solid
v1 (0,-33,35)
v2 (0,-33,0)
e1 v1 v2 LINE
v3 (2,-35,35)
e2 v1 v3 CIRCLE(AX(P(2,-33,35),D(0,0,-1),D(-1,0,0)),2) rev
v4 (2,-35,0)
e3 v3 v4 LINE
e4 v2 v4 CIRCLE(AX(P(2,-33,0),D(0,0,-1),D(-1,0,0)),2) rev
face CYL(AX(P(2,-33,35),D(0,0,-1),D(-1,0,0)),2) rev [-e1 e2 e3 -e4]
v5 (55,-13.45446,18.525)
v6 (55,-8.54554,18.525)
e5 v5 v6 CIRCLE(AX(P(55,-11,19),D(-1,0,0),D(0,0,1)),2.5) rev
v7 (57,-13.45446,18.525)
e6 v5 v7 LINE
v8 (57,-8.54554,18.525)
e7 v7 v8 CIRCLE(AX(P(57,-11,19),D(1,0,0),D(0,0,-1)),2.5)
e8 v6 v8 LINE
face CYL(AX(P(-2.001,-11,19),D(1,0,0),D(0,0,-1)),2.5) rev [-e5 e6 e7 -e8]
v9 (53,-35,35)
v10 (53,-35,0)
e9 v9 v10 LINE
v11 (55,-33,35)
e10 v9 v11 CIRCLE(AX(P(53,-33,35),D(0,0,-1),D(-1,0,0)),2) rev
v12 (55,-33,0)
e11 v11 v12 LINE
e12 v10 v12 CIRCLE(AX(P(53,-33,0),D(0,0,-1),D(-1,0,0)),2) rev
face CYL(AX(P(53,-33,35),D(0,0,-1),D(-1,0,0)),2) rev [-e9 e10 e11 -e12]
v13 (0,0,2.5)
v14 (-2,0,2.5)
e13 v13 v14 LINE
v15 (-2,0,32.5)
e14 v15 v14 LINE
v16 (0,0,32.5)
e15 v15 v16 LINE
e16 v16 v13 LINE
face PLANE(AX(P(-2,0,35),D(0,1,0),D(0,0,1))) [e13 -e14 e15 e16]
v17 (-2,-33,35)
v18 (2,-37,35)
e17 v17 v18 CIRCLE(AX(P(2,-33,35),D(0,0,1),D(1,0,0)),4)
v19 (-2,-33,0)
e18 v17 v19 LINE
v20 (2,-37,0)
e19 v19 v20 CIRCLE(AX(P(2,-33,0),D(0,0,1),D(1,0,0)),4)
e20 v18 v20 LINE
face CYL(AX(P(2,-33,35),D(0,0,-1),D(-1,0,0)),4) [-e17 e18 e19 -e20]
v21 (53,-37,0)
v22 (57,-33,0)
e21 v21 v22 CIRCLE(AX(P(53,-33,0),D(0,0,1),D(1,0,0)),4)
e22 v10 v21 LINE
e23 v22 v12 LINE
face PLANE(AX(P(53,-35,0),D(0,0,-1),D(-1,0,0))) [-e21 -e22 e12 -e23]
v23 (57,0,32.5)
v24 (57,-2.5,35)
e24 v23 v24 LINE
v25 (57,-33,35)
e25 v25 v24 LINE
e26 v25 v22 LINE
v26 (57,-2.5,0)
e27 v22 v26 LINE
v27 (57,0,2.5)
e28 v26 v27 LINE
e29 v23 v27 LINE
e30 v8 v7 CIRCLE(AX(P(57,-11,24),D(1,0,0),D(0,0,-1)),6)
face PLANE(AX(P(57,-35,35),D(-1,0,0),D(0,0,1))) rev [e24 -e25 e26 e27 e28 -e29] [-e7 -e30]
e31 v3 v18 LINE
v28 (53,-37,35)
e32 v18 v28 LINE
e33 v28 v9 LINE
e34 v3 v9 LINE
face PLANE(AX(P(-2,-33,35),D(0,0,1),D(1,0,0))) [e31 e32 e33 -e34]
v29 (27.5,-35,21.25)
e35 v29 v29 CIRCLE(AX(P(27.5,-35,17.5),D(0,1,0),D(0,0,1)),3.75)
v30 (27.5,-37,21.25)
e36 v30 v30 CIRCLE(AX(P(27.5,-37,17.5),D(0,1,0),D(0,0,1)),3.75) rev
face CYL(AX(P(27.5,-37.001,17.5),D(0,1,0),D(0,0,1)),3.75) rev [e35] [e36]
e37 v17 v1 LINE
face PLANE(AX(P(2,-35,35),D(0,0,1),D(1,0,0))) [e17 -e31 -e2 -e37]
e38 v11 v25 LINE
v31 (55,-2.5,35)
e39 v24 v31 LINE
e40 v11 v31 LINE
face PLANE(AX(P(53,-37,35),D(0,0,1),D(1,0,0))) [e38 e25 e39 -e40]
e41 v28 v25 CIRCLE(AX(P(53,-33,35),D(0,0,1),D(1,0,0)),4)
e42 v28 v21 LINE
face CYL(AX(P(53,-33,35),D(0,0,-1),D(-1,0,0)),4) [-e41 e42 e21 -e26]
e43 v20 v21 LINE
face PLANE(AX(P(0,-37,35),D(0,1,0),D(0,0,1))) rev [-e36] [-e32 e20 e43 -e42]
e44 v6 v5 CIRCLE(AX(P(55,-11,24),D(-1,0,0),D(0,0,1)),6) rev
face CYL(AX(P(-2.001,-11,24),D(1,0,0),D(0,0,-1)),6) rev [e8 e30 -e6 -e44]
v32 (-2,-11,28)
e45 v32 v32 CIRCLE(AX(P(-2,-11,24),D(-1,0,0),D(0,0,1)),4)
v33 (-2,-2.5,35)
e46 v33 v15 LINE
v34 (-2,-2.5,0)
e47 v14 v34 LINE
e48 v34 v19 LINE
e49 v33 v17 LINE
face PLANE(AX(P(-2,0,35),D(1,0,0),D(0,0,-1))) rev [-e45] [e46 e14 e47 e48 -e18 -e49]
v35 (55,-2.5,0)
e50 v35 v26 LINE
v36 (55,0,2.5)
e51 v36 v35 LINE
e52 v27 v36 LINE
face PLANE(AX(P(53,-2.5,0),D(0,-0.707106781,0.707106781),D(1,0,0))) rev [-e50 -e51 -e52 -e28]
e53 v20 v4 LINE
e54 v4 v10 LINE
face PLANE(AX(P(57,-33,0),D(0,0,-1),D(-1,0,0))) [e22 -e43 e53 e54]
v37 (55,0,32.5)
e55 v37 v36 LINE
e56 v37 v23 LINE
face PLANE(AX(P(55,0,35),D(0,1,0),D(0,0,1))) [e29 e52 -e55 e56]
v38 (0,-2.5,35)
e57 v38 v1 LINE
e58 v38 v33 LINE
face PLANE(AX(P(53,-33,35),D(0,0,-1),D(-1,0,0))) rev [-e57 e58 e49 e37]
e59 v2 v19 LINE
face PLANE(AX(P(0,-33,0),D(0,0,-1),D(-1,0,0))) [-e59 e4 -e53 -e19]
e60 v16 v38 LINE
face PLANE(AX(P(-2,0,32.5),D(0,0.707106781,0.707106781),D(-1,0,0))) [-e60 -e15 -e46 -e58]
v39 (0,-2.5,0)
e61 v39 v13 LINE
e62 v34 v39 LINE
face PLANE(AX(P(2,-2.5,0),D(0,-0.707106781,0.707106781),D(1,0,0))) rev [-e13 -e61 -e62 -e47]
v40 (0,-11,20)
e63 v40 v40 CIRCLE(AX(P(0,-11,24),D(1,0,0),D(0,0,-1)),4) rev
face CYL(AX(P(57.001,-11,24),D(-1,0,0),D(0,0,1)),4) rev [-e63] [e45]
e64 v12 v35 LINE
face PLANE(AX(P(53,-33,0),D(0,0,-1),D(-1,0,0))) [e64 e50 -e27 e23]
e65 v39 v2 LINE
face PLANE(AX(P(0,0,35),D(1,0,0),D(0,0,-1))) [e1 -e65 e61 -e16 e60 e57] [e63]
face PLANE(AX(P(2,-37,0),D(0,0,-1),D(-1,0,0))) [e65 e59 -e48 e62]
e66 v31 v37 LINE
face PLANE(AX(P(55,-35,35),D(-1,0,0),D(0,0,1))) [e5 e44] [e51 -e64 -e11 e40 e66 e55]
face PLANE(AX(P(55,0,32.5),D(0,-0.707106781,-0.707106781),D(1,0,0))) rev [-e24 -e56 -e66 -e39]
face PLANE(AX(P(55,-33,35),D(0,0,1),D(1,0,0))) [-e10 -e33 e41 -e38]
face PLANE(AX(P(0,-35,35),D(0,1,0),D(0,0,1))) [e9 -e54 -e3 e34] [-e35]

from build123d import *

# Parameters (mm, degrees)
BASE_FLANGE1_DEPTH = 35
CUT_EXTRUDE1_REACH = 79.942
CUT_EXTRUDE2_REACH = 79.942
SKETCH7_R          = 4
CUT_EXTRUDE3_REACH = 77.492
SKETCH8_R          = 3.75
CHAMFER1_SIZE      = 2.5


# Sheet-metal steps are written as plain solids
with BuildPart() as part:
    # Sketch1 → Base-Flange1 (new body)
    with BuildSketch(Plane.XY):
        with BuildLine():
            Line((0, 0), (0, -33))
            ThreePointArc((0, -33), (0.585786438, -34.414213562), (2, -35))
            Line((2, -35), (53, -35))
            ThreePointArc((53, -35), (54.414213562, -34.414213562), (55, -33))
            Line((55, -33), (55, 0))
            Line((55, 0), (57, 0))
            Line((57, 0), (57, -33))
            ThreePointArc((57, -33), (55.828427125, -35.828427125), (53, -37))
            Line((53, -37), (2, -37))
            ThreePointArc((2, -37), (-0.828427125, -35.828427125), (-2, -33))
            Line((-2, -33), (-2, 0))
            Line((-2, 0), (0, 0))
        make_face()
    extrude(amount=BASE_FLANGE1_DEPTH)

    # Sketch6 → Cut-Extrude1 (cut, up to next)
    with BuildSketch(Plane(origin=(57, 0, 0), x_dir=(0, 0, -1), z_dir=(1, 0, 0)), mode=Mode.PRIVATE) as cut_extrude1_sk1:
        with BuildLine():
            ThreePointArc((-18.525, -8.545539774), (-30, -11), (-18.525, -13.454460226))
            ThreePointArc((-18.525, -13.454460226), (-16.5, -11), (-18.525, -8.545539774))
        make_face()
    cut_extrude1_tool1 = extrude(cut_extrude1_sk1.sketch, amount=-CUT_EXTRUDE1_REACH, mode=Mode.PRIVATE) & part.part
    add(cut_extrude1_tool1.solids().sort_by_distance((57, -11, 23.686214))[0], mode=Mode.SUBTRACT)

    # Sketch7 → Cut-Extrude2 (cut, up to next)
    with BuildSketch(Plane.ZY.offset(2), mode=Mode.PRIVATE) as cut_extrude2_sk1:
        with Locations((24, -11)):
            Circle(SKETCH7_R)
    cut_extrude2_tool1 = extrude(cut_extrude2_sk1.sketch, amount=-CUT_EXTRUDE2_REACH, mode=Mode.PRIVATE) & part.part
    add(cut_extrude2_tool1.solids().sort_by_distance((-2, -11, 24))[0], mode=Mode.SUBTRACT)

    # Sketch8 → Cut-Extrude3 (cut, up to next)
    with BuildSketch(Plane(origin=(0, -35, 0), x_dir=(1, 0, 0), z_dir=(0, 1, 0)), mode=Mode.PRIVATE) as cut_extrude3_sk1:
        with Locations(Location((27.5, -17.5, 0), (0, 0, 270))):
            Circle(SKETCH8_R)
    cut_extrude3_tool1 = extrude(cut_extrude3_sk1.sketch, amount=-CUT_EXTRUDE3_REACH, mode=Mode.PRIVATE) & part.part
    add(cut_extrude3_tool1.solids().sort_by_distance((27.5, -35, 17.5))[0], mode=Mode.SUBTRACT)

    # Chamfer1
    chamfer1_edges = [part.edges().sort_by_distance(p)[0] for p in [
        (-1, 0, 0),
        (56, 0, 0),
        (-1, 0, 35),
        (56, 0, 35),
    ]]
    chamfer(chamfer1_edges, length=CHAMFER1_SIZE)


solid = part.part
